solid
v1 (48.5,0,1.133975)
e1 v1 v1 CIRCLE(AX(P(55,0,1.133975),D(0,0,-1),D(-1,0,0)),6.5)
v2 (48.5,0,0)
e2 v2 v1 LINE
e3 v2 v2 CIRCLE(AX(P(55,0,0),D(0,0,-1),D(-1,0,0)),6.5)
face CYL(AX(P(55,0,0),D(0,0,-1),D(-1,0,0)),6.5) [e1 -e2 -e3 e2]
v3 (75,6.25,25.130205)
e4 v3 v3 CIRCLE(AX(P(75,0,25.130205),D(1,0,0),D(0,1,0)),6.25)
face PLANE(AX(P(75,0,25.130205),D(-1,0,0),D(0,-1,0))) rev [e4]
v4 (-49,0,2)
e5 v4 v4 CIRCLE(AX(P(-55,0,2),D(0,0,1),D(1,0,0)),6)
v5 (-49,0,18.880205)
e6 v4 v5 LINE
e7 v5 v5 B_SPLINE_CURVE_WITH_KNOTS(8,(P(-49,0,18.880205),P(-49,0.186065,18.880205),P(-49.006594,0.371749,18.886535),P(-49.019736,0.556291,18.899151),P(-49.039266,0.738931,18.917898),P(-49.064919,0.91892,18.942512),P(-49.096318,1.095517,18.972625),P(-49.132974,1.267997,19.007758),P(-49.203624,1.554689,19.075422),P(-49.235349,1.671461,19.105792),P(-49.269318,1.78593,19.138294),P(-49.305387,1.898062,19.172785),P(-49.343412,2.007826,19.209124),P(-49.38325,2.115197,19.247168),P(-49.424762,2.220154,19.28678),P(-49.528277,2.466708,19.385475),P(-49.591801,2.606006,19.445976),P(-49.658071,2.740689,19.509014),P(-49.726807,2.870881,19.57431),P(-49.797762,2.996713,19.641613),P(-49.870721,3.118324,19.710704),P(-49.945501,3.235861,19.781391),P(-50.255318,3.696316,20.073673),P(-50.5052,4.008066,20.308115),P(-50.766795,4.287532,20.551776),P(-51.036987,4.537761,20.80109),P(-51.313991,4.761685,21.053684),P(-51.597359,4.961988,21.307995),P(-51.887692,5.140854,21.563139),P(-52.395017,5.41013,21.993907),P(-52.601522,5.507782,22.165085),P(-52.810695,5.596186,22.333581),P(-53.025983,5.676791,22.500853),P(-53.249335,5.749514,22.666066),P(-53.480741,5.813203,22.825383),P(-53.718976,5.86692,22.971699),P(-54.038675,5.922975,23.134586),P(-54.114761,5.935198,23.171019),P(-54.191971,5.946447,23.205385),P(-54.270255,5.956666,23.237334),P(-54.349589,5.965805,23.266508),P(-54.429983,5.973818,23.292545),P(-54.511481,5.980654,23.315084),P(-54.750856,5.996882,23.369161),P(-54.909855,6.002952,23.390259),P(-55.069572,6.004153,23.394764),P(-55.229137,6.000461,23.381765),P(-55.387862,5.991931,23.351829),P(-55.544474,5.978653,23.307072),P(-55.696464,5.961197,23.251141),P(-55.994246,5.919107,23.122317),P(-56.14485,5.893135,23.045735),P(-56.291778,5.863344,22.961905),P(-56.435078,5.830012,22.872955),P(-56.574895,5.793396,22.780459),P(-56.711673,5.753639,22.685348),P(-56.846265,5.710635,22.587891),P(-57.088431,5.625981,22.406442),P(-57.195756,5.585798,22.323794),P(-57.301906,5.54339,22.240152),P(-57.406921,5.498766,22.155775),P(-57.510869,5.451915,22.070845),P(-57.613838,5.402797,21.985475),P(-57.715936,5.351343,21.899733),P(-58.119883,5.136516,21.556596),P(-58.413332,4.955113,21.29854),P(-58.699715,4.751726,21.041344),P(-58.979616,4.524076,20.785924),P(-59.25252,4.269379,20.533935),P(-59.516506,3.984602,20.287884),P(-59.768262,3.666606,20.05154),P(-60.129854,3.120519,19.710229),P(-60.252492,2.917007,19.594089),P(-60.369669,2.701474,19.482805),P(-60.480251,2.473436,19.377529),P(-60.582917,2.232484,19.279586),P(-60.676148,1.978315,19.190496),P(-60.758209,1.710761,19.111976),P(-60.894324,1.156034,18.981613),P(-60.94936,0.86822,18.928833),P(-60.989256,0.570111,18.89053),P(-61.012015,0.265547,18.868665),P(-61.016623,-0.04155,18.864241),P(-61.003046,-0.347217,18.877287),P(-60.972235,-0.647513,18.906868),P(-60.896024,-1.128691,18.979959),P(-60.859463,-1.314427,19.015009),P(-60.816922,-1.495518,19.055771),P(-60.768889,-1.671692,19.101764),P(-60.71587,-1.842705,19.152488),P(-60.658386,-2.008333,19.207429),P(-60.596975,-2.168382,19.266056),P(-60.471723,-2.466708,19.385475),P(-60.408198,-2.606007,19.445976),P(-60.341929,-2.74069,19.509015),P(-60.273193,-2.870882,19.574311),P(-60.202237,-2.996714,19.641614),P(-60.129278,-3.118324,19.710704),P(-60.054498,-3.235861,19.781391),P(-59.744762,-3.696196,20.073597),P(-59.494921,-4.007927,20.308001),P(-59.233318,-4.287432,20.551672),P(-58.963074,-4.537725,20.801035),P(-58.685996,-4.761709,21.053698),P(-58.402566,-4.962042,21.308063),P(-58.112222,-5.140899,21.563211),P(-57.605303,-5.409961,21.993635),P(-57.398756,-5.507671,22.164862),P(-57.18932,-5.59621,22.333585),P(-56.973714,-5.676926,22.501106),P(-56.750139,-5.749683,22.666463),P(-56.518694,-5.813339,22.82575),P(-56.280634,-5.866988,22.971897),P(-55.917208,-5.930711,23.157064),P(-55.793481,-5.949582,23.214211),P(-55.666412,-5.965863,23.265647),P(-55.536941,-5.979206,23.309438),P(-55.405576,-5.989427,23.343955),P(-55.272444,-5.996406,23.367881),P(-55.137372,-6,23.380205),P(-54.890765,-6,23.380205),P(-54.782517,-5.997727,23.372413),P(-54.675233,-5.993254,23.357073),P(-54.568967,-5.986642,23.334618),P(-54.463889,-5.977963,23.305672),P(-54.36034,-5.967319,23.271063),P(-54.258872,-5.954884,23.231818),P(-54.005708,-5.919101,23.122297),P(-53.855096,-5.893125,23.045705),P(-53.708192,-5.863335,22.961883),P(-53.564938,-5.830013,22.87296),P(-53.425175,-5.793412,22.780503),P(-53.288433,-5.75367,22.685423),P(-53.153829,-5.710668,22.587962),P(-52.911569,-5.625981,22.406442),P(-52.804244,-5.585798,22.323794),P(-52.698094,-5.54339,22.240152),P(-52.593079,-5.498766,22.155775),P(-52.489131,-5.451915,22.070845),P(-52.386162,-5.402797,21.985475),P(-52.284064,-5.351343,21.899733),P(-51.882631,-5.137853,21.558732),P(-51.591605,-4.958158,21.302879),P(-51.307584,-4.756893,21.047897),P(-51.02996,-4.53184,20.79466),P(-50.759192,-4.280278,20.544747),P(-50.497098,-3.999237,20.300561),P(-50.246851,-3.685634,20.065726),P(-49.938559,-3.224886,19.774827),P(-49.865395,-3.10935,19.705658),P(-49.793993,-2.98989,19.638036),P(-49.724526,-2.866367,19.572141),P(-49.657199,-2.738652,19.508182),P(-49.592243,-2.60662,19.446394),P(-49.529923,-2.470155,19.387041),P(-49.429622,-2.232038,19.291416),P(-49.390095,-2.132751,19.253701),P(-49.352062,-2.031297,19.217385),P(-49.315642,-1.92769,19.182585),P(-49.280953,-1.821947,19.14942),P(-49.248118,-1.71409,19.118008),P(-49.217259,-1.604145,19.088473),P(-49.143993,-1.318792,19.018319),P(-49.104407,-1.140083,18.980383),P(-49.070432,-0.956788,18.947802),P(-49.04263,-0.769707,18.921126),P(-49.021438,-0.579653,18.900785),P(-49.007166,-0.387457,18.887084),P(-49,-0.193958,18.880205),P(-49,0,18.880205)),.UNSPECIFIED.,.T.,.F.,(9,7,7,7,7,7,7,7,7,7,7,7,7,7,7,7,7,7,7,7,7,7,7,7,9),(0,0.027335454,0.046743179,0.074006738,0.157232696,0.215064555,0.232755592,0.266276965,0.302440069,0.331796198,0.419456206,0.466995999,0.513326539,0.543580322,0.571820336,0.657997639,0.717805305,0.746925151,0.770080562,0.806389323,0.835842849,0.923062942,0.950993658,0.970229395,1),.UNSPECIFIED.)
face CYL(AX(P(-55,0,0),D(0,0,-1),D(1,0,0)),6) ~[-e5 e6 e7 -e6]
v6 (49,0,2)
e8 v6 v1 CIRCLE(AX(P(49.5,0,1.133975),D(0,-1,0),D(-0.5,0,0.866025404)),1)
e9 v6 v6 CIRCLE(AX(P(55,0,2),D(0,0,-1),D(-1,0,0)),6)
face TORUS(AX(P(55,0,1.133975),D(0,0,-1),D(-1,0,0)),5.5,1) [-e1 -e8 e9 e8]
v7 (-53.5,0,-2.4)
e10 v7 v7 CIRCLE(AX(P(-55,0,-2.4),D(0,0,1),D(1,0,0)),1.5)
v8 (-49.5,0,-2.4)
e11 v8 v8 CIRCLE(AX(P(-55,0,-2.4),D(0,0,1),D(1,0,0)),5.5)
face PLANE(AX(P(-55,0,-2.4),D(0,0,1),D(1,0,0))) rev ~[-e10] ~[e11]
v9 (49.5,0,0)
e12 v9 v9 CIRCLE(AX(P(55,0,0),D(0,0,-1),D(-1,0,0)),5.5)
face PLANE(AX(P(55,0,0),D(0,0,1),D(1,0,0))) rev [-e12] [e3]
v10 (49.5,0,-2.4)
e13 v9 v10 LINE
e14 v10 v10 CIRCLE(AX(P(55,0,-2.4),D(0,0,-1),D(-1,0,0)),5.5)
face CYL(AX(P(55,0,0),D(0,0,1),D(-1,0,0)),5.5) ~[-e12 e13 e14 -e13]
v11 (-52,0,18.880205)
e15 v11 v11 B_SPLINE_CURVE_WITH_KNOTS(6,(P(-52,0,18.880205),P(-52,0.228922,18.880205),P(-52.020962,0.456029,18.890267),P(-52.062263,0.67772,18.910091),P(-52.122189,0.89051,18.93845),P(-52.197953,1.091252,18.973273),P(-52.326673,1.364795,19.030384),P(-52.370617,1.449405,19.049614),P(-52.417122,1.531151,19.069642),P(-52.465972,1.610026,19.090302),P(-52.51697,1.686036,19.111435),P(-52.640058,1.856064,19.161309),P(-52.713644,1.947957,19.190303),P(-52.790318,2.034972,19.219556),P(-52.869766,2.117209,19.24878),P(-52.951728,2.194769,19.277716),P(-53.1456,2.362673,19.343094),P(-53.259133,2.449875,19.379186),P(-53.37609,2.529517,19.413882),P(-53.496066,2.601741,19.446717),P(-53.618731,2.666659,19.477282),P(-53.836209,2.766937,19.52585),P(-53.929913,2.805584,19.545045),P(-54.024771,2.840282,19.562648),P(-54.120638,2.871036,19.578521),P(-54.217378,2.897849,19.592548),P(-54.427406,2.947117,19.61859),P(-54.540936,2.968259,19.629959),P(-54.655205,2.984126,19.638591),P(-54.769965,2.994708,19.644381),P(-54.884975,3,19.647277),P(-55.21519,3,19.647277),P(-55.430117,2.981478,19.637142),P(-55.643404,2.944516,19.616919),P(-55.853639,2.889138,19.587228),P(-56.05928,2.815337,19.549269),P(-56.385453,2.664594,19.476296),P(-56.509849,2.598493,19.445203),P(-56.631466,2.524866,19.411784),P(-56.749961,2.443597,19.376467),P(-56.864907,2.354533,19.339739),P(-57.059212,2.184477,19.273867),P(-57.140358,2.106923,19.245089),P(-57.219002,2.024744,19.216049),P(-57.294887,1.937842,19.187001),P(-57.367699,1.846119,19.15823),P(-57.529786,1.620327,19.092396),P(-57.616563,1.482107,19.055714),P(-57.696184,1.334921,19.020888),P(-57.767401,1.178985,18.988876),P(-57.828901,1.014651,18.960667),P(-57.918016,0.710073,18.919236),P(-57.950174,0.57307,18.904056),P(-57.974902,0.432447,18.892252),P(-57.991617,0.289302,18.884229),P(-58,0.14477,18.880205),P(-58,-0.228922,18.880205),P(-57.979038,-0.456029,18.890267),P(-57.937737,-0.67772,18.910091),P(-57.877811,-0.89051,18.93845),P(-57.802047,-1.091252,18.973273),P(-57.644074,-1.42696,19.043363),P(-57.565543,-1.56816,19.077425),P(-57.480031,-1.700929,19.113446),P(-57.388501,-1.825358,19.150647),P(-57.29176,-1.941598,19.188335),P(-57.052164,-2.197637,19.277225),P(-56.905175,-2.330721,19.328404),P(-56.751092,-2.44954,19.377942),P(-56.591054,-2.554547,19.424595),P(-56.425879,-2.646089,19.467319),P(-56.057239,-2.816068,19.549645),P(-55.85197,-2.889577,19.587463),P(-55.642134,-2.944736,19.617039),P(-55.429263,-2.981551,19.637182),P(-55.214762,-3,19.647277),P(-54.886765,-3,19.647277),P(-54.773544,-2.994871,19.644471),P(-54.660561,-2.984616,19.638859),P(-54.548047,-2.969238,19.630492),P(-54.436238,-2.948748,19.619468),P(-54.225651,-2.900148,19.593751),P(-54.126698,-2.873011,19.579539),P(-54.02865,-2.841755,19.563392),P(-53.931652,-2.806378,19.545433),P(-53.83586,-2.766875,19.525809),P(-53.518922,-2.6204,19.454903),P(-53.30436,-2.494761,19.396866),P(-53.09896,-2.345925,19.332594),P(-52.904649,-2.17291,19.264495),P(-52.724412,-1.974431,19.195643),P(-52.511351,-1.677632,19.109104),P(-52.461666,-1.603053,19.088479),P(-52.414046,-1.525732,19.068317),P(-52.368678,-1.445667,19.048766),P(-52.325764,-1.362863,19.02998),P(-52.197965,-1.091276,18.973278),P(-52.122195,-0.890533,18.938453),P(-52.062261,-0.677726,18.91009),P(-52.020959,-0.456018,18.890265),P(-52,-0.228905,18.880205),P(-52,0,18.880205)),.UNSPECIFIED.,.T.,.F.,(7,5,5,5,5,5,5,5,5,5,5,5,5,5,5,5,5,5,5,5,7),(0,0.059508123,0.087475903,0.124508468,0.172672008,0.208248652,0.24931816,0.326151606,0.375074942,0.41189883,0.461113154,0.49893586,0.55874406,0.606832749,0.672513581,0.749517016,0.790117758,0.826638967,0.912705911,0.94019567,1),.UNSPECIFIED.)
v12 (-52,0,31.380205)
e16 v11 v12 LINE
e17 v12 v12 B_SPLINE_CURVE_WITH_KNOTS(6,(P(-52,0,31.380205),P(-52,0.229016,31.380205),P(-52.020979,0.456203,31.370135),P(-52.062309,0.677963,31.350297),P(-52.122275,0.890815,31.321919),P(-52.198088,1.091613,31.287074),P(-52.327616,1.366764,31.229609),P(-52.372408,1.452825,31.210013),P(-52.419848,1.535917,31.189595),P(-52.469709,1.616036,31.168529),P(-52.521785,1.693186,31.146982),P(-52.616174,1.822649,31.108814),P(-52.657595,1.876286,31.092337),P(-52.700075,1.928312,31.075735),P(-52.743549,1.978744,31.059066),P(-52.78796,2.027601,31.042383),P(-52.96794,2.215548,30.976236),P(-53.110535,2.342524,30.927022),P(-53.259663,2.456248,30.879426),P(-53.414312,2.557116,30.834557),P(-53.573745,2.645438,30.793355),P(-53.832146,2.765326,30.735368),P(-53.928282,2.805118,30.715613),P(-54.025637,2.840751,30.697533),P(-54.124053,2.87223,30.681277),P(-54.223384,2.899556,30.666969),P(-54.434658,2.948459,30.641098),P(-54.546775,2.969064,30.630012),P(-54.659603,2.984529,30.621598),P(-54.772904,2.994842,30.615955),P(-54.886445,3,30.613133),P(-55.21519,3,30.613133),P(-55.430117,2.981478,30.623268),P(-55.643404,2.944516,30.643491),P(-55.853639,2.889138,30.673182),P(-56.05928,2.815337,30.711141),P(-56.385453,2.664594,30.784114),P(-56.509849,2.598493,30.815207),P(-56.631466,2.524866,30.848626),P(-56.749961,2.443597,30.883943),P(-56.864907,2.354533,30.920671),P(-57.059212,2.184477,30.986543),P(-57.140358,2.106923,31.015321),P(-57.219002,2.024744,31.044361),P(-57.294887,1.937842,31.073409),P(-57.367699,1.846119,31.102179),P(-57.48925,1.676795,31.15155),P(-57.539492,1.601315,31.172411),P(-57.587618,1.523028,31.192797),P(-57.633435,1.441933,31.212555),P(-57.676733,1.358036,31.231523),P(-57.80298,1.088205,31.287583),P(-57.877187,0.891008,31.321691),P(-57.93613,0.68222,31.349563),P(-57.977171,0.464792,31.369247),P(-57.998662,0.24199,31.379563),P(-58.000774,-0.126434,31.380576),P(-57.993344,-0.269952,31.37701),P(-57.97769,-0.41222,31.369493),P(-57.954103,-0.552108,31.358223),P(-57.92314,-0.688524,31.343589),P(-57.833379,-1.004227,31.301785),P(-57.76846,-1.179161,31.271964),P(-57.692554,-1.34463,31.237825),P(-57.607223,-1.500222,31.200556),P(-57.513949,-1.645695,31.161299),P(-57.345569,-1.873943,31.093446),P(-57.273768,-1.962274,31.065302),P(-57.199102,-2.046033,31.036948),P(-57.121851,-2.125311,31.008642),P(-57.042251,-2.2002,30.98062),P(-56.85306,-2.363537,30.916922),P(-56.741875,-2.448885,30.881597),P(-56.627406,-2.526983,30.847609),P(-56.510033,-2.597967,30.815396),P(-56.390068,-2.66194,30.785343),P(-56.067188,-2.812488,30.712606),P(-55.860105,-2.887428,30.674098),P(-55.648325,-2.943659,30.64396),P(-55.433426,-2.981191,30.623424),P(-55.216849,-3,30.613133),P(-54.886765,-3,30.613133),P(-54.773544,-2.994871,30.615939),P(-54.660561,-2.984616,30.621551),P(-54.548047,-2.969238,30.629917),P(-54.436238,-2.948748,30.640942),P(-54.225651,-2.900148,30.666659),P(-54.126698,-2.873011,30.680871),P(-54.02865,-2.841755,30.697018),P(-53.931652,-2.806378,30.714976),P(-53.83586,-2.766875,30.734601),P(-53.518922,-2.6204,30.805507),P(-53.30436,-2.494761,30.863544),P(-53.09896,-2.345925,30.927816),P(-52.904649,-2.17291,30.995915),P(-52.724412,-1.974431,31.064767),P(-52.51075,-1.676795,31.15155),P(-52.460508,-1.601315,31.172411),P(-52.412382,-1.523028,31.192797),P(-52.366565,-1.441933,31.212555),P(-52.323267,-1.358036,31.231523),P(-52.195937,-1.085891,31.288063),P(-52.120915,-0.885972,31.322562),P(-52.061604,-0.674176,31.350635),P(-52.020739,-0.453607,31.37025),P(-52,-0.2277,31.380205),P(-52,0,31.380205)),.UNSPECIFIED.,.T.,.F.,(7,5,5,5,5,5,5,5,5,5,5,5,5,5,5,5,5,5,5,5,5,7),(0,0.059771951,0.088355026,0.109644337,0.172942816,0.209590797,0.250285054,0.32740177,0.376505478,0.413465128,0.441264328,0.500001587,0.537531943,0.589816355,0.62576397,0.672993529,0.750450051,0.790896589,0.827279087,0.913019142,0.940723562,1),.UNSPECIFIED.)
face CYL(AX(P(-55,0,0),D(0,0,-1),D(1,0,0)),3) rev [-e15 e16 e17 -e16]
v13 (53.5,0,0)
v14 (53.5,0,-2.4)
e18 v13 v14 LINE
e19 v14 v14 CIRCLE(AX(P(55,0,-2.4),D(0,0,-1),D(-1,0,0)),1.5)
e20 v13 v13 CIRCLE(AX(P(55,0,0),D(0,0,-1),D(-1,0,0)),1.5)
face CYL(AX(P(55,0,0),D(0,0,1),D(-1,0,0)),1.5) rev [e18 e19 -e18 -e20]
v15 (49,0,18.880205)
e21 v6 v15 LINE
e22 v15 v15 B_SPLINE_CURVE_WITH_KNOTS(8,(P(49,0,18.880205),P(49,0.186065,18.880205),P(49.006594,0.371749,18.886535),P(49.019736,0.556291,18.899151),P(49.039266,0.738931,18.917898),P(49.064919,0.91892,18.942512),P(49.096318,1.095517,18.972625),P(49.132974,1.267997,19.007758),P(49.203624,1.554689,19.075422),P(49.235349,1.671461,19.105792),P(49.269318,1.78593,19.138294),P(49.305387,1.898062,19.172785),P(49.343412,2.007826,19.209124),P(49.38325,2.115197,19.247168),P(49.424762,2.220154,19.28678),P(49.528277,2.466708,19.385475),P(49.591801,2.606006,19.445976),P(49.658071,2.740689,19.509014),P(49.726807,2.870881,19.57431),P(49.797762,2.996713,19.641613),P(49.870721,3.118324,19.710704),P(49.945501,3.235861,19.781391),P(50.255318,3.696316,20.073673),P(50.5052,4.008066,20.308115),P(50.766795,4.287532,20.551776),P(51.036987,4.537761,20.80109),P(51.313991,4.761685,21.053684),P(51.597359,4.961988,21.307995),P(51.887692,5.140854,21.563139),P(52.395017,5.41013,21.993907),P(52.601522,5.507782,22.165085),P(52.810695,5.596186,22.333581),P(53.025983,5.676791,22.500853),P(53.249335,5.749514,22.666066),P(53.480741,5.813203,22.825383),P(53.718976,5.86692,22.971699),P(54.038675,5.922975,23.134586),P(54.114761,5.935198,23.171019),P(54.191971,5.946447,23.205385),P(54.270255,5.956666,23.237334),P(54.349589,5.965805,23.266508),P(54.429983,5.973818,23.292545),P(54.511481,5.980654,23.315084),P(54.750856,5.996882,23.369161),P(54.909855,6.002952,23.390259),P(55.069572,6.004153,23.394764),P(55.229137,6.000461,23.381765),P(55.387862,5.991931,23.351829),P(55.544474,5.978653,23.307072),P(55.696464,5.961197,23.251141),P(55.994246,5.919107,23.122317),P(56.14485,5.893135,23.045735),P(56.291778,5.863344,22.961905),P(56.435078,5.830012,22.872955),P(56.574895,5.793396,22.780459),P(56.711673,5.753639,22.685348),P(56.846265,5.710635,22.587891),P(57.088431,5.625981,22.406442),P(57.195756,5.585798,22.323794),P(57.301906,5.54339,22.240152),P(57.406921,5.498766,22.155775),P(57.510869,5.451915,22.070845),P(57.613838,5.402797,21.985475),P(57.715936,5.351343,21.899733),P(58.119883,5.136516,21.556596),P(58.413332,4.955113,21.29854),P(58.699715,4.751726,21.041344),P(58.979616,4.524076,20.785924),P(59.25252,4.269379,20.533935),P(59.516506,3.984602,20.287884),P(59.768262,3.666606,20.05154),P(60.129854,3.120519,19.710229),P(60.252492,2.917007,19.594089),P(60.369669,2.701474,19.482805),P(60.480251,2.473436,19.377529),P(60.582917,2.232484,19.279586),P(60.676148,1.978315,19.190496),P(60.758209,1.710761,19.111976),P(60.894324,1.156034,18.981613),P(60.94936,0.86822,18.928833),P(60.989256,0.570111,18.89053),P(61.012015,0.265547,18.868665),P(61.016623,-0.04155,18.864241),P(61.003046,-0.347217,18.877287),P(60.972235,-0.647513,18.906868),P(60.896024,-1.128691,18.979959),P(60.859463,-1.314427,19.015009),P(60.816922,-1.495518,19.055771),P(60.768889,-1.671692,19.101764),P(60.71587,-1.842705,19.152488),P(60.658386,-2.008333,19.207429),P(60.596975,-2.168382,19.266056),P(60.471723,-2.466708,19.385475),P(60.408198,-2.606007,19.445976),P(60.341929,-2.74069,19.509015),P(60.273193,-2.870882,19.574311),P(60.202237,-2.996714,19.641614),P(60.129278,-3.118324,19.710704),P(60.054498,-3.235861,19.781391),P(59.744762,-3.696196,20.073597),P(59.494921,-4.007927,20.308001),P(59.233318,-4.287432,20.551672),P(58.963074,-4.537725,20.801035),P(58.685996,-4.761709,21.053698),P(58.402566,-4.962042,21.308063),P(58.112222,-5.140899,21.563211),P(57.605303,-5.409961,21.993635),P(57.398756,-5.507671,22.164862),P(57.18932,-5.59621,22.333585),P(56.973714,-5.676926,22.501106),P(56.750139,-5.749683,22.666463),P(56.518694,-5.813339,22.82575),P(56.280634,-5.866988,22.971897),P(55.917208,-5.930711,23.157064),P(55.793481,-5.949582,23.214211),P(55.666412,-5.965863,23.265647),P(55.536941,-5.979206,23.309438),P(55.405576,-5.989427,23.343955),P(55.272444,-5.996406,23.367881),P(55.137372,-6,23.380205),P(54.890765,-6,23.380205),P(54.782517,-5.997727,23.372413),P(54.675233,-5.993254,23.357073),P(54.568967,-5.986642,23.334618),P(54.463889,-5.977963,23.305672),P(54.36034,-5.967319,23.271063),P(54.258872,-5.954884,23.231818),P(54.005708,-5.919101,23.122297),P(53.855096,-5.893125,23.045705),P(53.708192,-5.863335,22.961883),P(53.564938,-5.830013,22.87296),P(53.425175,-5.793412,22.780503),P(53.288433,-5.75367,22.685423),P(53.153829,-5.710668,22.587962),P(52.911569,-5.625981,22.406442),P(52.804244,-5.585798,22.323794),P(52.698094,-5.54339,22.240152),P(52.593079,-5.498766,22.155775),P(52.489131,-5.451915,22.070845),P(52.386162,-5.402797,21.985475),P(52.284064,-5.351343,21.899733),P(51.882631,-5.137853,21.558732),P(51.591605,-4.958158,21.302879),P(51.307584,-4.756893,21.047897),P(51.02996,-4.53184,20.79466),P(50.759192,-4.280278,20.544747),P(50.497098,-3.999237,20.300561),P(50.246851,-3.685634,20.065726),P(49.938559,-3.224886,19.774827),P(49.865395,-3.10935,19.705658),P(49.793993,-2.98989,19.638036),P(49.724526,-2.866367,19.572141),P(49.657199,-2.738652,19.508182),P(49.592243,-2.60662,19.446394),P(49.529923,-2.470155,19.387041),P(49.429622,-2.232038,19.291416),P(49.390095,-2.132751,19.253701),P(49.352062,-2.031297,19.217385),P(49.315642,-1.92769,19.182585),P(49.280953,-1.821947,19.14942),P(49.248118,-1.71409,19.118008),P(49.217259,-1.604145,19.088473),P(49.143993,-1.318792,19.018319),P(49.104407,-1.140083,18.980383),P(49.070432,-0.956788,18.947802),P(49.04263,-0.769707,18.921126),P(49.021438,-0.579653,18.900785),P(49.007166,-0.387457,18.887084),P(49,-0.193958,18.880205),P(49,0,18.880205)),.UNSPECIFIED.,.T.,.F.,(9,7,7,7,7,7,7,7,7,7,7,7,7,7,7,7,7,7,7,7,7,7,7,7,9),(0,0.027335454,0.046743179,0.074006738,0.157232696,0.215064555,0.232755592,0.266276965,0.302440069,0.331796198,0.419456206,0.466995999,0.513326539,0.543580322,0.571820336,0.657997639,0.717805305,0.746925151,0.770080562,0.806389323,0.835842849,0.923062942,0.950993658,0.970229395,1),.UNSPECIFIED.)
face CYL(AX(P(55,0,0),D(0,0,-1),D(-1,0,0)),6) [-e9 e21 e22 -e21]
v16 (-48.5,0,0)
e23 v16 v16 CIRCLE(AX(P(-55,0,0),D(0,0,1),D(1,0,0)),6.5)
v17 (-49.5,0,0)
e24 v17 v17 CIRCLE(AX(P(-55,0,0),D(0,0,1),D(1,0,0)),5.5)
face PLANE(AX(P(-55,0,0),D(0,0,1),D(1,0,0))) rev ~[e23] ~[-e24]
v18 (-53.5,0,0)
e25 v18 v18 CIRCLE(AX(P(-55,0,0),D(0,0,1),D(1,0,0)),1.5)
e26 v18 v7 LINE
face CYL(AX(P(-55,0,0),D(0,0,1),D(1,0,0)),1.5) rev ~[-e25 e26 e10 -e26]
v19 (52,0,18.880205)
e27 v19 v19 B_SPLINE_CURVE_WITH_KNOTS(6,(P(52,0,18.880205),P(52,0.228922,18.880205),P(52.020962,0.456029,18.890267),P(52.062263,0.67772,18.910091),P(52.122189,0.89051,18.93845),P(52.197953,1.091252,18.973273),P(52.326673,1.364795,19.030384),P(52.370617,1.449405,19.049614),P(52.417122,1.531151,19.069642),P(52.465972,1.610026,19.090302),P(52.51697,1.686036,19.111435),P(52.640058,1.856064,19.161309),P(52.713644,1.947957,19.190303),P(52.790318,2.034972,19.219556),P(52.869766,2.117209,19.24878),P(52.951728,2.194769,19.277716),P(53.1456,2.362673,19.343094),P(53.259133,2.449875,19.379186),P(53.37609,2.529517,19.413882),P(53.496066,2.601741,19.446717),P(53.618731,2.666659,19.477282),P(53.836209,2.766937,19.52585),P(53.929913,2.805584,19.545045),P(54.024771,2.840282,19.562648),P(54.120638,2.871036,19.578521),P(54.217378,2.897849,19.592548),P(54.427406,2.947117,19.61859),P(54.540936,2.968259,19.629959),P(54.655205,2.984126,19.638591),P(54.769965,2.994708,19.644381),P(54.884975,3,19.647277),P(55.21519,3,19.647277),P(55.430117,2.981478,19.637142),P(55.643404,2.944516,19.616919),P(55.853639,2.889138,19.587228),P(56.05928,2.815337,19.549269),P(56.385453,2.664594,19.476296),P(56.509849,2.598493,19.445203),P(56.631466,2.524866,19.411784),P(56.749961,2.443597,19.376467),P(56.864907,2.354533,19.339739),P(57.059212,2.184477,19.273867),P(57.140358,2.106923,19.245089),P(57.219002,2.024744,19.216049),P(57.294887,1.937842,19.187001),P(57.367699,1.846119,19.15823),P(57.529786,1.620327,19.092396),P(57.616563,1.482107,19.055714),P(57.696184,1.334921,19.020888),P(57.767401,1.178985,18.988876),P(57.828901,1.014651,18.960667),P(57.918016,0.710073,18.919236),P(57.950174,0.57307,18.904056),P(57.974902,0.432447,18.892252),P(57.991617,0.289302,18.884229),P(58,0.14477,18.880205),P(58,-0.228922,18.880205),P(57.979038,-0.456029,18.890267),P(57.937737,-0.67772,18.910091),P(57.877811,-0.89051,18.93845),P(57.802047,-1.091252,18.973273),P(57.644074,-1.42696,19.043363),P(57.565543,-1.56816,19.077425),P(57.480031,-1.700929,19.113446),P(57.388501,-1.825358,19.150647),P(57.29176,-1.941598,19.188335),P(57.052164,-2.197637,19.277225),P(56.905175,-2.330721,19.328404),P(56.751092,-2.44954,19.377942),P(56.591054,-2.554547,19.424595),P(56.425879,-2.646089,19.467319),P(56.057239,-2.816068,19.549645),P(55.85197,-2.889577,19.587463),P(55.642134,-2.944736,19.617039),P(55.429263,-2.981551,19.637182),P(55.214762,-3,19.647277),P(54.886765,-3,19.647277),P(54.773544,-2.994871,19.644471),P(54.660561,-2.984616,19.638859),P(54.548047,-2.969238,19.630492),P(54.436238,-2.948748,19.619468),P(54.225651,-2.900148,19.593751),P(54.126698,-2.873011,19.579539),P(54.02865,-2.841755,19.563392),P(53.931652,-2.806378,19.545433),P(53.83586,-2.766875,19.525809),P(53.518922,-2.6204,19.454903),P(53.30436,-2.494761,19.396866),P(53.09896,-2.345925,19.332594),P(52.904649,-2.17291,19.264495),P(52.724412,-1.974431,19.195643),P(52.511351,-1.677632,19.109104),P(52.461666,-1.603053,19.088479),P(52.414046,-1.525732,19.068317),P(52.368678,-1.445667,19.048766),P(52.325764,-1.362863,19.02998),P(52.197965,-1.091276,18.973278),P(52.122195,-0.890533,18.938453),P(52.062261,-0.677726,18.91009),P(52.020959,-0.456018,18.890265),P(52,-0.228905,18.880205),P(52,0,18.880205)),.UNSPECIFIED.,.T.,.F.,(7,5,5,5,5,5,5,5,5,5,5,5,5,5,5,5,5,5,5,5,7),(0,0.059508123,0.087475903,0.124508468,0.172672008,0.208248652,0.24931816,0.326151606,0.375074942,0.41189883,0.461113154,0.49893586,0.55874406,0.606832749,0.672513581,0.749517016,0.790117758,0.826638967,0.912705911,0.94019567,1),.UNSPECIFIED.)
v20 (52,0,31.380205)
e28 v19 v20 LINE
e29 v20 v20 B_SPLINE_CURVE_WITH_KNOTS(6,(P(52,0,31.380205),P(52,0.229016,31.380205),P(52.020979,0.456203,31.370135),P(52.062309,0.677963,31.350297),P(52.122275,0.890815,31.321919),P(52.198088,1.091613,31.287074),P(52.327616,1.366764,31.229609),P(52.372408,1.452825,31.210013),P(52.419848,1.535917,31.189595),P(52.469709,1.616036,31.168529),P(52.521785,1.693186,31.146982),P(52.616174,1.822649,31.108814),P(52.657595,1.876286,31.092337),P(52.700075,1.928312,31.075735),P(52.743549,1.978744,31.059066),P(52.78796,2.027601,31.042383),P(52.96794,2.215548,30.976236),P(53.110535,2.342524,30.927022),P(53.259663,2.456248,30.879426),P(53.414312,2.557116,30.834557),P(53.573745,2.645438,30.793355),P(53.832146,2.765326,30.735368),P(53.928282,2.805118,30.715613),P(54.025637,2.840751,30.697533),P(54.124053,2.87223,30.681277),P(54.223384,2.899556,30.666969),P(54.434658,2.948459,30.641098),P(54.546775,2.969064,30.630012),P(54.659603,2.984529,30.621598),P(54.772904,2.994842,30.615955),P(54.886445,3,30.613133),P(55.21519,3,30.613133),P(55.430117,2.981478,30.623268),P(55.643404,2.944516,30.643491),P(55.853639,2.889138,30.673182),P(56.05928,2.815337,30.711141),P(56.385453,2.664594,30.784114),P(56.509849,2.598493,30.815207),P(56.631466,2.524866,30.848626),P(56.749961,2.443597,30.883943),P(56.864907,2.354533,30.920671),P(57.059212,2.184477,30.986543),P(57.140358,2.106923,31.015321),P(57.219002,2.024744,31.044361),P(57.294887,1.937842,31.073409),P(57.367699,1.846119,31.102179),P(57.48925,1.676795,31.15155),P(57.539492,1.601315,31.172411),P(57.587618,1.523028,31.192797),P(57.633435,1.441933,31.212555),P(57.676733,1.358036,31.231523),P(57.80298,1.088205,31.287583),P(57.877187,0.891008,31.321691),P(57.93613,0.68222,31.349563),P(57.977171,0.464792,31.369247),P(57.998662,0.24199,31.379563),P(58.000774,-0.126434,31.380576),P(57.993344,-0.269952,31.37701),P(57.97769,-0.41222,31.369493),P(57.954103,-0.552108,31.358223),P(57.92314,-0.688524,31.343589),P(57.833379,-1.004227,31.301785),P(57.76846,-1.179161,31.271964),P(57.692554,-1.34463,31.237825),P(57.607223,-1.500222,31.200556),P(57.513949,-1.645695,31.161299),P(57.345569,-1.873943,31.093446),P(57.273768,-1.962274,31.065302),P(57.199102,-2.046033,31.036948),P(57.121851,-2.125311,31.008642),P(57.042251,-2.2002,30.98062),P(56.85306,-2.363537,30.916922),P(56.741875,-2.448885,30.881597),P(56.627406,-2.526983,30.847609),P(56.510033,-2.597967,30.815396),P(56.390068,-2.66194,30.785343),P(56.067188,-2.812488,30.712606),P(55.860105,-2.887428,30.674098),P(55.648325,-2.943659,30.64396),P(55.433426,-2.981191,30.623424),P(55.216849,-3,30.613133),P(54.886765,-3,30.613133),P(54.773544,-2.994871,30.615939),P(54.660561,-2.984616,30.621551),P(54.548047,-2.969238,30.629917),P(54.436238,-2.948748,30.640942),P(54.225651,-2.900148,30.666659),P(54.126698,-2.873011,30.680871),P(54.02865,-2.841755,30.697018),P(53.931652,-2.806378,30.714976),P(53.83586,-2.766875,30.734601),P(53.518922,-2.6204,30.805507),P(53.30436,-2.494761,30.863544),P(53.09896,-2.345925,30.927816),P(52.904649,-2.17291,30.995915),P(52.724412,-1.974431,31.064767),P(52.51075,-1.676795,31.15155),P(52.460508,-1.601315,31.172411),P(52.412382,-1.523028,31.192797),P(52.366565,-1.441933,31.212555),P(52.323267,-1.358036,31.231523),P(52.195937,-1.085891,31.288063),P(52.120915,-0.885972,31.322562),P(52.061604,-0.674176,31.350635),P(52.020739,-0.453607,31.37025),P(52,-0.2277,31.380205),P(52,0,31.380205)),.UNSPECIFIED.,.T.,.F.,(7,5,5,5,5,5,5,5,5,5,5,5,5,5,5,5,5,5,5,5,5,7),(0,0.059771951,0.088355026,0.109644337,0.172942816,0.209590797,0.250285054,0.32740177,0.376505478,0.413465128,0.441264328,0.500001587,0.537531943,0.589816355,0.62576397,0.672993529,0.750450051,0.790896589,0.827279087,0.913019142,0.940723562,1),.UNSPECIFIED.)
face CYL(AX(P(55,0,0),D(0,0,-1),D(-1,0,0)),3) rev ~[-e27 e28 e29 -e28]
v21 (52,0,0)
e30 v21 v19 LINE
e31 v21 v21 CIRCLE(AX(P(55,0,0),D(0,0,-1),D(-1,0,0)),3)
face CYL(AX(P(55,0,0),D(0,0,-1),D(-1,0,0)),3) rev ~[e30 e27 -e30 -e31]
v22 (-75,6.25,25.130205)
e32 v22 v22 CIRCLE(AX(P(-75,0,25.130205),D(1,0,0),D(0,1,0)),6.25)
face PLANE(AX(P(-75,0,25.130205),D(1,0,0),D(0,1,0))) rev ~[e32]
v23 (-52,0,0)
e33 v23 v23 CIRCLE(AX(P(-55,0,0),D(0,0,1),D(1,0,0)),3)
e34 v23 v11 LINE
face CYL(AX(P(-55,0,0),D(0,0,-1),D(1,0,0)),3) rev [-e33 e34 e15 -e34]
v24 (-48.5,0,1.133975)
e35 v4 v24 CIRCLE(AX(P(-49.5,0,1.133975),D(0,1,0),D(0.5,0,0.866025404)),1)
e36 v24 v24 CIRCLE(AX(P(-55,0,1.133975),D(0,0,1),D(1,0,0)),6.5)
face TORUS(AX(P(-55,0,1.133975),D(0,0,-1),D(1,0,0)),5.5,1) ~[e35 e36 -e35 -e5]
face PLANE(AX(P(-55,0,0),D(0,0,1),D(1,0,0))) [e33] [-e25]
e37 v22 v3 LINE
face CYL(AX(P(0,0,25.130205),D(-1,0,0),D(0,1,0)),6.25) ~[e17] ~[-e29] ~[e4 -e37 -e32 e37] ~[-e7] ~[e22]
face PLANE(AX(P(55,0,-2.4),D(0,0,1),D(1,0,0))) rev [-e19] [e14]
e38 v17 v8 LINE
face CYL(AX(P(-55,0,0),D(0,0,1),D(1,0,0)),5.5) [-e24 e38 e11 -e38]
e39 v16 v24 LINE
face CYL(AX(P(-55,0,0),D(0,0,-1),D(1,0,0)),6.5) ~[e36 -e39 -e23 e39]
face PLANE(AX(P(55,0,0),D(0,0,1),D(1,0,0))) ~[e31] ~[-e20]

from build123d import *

# Parameters (mm, degrees)
F0_R     = 6
F0_R_2   = 5.5
F0_R_3   = 3
F1_DEPTH = 25
F0_R_4   = 6.5
F2_DEPTH = 2
F0_R_5   = 1.5
F3_DEPTH = 2.4
F4_R     = 6.25
F5_DEPTH = 75
F6_DEPTH = 40


# Not quite as in the source:
# - a fillet or chamfer that OpenCascade refuses, or shapes differently, is made with other operations: its cross-section is extruded or revolved along the edge and cut away or added


with BuildPart() as f1:
    # F0 (on Top) → F1 (new body)
    with BuildSketch(Plane.XY):
        with Locations((-55, 0)):
            Circle(F0_R)
        with Locations((-55, 0)):
            Circle(F0_R_2, mode=Mode.SUBTRACT)
        with Locations((-55, 0)):
            Circle(F0_R_2)
        with Locations((-55, 0)):
            Circle(F0_R_3, mode=Mode.SUBTRACT)
    extrude(amount=F1_DEPTH)

    # F0 (on Top) → F2 (join)
    with BuildSketch(Plane.XY):
        with Locations((-55, 0)):
            Circle(F0_R_4)
        with Locations((-55, 0)):
            Circle(F0_R, mode=Mode.SUBTRACT)
    extrude(amount=F2_DEPTH)

    # F0 (on Top) → F3 (join)
    with BuildSketch(Plane.XY):
        with Locations((-55, 0)):
            Circle(F0_R_2)
        with Locations((-55, 0)):
            Circle(F0_R_3, mode=Mode.SUBTRACT)
        with Locations((-55, 0)):
            Circle(F0_R_3)
        with Locations((-55, 0)):
            Circle(F0_R_5, mode=Mode.SUBTRACT)
    extrude(amount=-F3_DEPTH)

    # F4 (on Right) → F5 (join)
    with BuildSketch(Plane.YZ):
        with Locations((0, 25.1302048564)):
            Circle(F4_R)
    extrude(amount=-F5_DEPTH)

    # F0 (on Top) → F6 (cut)
    with BuildSketch(Plane.XY):
        with Locations((-55, 0)):
            Circle(F0_R_3)
        with Locations((-55, 0)):
            Circle(F0_R_5, mode=Mode.SUBTRACT)
        with Locations((-55, 0)):
            Circle(F0_R_5)
    extrude(amount=F6_DEPTH, mode=Mode.SUBTRACT)

    # F7: fillet of radius 1 on 1 edges, made by hand

    # F7_s1 → F7_t2 (revolve, cut)
    with BuildSketch(Plane.XZ):
        with BuildLine():
            ThreePointArc((-49, 2), (-48.6339745962, 1.6339745962), (-48.5, 1.1339745962))
            Line((-48.5, 1.1339745962), (-48.5, 2))
            Line((-48.5, 2), (-49, 2))
        make_face()
    revolve(axis=Axis((-55, 0, 2), (0, 0, 1)), mode=Mode.SUBTRACT)

    # F8: F1 across plane


with BuildPart() as f1_1:
    add(f1.part)
    add(f1.part.mirror(Plane.YZ))


solid = f1_1.part
